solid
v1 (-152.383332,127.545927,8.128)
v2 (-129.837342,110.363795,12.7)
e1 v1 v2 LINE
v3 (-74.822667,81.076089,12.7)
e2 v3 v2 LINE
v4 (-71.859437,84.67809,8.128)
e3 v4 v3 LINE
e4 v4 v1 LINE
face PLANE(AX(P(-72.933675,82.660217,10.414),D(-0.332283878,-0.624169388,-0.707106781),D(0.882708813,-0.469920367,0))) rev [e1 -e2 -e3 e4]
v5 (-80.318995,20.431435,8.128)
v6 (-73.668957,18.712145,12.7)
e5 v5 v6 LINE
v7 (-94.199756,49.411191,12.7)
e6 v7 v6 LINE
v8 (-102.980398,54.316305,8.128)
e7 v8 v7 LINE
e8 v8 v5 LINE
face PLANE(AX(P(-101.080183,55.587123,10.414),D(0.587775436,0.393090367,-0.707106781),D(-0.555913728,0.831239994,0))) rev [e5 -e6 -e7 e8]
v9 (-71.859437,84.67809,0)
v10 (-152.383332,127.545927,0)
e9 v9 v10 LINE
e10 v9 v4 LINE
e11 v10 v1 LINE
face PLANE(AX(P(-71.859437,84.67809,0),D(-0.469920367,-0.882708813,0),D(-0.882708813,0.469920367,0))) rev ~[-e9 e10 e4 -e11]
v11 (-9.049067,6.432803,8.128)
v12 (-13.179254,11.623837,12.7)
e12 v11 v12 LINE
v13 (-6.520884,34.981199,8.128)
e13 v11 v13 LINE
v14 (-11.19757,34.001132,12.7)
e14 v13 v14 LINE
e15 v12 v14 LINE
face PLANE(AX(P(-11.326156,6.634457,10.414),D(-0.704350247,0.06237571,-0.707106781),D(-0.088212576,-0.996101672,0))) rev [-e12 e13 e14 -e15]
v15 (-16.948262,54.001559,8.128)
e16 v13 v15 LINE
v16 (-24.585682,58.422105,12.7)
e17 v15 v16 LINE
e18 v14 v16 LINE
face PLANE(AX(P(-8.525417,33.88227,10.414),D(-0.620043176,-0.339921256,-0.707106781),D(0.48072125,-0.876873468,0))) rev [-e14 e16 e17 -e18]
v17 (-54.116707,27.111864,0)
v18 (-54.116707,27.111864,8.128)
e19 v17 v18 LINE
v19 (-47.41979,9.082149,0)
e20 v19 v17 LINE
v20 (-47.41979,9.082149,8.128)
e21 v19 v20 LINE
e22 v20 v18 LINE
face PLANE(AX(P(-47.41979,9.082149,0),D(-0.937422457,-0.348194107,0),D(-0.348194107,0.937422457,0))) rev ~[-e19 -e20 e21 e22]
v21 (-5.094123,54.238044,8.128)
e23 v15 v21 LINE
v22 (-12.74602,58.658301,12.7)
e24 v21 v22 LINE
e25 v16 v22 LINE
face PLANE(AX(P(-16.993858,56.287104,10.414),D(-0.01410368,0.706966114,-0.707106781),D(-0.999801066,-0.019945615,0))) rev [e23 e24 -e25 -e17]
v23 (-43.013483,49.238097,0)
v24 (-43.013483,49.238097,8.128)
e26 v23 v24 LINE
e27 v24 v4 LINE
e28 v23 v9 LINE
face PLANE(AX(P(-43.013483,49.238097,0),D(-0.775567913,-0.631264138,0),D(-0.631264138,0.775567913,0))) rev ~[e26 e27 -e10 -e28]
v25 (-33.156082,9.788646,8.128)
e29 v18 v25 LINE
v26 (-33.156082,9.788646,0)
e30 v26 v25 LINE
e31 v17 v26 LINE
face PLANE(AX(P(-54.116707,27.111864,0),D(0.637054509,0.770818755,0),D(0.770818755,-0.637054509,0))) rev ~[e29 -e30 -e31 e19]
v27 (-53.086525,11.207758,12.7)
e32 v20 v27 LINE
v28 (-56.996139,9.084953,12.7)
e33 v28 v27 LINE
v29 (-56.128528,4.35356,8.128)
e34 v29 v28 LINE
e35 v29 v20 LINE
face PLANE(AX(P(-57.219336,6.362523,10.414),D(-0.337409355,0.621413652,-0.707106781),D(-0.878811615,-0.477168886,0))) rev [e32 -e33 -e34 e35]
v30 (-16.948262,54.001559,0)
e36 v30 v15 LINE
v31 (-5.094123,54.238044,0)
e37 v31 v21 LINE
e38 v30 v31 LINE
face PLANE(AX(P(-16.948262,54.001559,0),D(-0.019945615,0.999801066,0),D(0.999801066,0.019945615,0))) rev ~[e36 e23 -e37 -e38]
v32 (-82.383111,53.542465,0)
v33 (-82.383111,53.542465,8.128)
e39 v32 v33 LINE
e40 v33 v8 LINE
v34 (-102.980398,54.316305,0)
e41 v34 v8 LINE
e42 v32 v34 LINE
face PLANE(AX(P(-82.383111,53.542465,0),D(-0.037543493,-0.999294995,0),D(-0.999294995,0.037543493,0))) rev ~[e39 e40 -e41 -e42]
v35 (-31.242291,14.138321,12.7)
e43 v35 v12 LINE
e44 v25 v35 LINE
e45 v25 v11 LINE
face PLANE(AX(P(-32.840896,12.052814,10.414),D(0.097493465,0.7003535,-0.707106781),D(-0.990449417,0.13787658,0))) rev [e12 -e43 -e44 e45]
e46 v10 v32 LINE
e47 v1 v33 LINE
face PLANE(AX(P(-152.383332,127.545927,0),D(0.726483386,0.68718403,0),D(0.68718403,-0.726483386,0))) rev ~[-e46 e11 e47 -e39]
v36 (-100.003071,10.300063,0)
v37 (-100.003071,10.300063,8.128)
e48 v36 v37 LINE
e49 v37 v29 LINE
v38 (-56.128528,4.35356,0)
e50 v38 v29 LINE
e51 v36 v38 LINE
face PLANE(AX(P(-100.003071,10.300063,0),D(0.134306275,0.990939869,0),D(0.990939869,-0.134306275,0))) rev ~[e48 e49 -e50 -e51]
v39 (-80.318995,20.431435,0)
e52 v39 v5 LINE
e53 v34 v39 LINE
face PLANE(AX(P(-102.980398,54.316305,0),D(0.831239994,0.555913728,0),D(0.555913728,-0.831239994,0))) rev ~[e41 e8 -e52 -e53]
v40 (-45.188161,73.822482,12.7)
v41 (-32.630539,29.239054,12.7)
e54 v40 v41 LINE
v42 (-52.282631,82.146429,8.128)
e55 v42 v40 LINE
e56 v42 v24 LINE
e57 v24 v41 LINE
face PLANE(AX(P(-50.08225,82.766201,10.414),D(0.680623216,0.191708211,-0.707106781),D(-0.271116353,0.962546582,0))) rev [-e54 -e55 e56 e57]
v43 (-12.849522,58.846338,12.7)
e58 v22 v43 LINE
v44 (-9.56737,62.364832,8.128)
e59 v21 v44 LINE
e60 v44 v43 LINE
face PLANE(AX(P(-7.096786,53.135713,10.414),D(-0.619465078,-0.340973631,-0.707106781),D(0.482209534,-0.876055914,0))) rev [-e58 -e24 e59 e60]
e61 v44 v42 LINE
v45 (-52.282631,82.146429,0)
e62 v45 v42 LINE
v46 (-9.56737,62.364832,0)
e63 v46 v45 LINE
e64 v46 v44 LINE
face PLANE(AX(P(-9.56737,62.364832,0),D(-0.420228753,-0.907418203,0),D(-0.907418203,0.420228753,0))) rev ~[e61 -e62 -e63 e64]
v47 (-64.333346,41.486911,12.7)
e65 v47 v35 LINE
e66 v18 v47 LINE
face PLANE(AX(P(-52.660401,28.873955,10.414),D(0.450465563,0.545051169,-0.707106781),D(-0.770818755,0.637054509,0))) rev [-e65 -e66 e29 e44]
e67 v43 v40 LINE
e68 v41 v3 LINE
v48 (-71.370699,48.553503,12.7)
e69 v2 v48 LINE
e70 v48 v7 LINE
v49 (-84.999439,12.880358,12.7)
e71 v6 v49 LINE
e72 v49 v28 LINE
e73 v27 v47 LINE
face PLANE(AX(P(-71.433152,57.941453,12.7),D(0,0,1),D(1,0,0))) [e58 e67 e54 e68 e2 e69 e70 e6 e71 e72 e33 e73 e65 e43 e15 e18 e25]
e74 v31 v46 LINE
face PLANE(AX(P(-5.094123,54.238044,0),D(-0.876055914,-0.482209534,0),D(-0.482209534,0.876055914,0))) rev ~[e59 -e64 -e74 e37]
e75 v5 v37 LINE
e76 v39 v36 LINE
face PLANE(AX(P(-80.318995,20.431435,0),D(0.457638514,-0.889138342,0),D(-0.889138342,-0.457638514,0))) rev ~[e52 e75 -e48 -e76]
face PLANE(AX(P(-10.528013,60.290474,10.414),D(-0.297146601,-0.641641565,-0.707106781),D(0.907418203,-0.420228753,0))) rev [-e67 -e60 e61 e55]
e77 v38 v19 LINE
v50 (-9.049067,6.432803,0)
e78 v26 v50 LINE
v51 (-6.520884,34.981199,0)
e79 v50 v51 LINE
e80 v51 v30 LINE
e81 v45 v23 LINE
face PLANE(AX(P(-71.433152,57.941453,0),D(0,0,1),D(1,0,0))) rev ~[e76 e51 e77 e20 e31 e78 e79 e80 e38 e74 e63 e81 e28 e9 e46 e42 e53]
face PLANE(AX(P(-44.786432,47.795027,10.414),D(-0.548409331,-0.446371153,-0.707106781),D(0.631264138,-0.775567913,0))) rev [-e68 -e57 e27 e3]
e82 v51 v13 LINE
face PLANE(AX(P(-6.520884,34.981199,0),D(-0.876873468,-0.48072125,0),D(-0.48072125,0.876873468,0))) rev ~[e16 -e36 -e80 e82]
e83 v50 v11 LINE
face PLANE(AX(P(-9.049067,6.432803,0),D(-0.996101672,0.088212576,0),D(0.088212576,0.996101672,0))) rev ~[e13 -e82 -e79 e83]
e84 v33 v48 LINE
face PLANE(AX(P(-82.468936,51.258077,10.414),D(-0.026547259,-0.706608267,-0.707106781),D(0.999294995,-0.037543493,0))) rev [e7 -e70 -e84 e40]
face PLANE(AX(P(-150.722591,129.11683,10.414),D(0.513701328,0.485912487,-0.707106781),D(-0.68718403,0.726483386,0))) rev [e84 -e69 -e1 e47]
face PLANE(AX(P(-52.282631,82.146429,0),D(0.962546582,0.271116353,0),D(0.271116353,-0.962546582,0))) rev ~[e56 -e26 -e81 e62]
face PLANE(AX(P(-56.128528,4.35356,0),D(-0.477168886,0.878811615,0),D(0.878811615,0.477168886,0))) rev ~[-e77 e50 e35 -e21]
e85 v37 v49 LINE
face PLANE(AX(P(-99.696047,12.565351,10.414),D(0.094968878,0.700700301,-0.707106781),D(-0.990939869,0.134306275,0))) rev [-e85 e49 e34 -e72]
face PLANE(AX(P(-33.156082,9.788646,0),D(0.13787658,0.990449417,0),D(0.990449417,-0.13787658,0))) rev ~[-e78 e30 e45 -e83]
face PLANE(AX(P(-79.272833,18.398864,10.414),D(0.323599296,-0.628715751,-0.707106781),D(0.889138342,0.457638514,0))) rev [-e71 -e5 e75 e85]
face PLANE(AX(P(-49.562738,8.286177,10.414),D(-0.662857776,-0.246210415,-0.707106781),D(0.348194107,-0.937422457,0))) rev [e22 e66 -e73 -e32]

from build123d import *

# Parameters (mm, degrees)
F1_DEPTH = 12.7
F2_SIZE  = 4.572


# Not quite as in the source:
# - a feature names something its author has since deleted; it is built from what else it names


with BuildPart() as f1:
    # F0 (on Top) → F1 (new body)
    with BuildSketch(Plane.XY):
        Polygon((-47.4197901785, 9.0821487829), (-54.1167072952, 27.1118637174), (-33.1560820341, 9.7886463627), (-9.0490672737, 6.4328033477), (-6.5208841115, 34.9811986089), (-16.9482622296, 54.0015585721), (-5.0941226073, 54.2380437255), (-9.5673697069, 62.3648315668), (-52.2826313972, 82.1464285254), (-43.0134832859, 49.2380969226), (-71.8594374871, 84.6780897401), (-152.3833320228, 127.5459273348), (-82.3831111193, 53.5424649715), (-102.9803976417, 54.3163046241), (-80.3189948201, 20.4314347357), (-100.0030711293, 10.3000625968), (-56.1285279691, 4.3535600416), align=None)
    extrude(amount=F1_DEPTH)

    # F2
    f2_edges = [f1.edges().sort_by_distance(p)[0] for p in [
        (-30.925001, 72.25563, 12.7),
        (-47.648057, 65.692263, 12.7),
        (-57.43646, 66.958093, 12.7),
        (-112.121385, 106.112009, 12.7),
        (-117.383222, 90.544196, 12.7),
        (-92.681754, 53.929385, 12.7),
        (-91.649696, 37.37387, 12.7),
        (-90.161033, 15.365749, 12.7),
        (-78.0658, 7.326811, 12.7),
        (-51.774159, 6.717854, 12.7),
        (-50.768249, 18.097006, 12.7),
        (-43.636395, 18.450255, 12.7),
        (-21.102575, 8.110725, 12.7),
        (-7.784976, 20.707001, 12.7),
        (-11.734573, 44.491379, 12.7),
        (-11.021192, 54.119801, 12.7),
        (-7.330746, 58.301438, 12.7),
    ]]
    chamfer(f2_edges, length=F2_SIZE)


solid = f1.part
